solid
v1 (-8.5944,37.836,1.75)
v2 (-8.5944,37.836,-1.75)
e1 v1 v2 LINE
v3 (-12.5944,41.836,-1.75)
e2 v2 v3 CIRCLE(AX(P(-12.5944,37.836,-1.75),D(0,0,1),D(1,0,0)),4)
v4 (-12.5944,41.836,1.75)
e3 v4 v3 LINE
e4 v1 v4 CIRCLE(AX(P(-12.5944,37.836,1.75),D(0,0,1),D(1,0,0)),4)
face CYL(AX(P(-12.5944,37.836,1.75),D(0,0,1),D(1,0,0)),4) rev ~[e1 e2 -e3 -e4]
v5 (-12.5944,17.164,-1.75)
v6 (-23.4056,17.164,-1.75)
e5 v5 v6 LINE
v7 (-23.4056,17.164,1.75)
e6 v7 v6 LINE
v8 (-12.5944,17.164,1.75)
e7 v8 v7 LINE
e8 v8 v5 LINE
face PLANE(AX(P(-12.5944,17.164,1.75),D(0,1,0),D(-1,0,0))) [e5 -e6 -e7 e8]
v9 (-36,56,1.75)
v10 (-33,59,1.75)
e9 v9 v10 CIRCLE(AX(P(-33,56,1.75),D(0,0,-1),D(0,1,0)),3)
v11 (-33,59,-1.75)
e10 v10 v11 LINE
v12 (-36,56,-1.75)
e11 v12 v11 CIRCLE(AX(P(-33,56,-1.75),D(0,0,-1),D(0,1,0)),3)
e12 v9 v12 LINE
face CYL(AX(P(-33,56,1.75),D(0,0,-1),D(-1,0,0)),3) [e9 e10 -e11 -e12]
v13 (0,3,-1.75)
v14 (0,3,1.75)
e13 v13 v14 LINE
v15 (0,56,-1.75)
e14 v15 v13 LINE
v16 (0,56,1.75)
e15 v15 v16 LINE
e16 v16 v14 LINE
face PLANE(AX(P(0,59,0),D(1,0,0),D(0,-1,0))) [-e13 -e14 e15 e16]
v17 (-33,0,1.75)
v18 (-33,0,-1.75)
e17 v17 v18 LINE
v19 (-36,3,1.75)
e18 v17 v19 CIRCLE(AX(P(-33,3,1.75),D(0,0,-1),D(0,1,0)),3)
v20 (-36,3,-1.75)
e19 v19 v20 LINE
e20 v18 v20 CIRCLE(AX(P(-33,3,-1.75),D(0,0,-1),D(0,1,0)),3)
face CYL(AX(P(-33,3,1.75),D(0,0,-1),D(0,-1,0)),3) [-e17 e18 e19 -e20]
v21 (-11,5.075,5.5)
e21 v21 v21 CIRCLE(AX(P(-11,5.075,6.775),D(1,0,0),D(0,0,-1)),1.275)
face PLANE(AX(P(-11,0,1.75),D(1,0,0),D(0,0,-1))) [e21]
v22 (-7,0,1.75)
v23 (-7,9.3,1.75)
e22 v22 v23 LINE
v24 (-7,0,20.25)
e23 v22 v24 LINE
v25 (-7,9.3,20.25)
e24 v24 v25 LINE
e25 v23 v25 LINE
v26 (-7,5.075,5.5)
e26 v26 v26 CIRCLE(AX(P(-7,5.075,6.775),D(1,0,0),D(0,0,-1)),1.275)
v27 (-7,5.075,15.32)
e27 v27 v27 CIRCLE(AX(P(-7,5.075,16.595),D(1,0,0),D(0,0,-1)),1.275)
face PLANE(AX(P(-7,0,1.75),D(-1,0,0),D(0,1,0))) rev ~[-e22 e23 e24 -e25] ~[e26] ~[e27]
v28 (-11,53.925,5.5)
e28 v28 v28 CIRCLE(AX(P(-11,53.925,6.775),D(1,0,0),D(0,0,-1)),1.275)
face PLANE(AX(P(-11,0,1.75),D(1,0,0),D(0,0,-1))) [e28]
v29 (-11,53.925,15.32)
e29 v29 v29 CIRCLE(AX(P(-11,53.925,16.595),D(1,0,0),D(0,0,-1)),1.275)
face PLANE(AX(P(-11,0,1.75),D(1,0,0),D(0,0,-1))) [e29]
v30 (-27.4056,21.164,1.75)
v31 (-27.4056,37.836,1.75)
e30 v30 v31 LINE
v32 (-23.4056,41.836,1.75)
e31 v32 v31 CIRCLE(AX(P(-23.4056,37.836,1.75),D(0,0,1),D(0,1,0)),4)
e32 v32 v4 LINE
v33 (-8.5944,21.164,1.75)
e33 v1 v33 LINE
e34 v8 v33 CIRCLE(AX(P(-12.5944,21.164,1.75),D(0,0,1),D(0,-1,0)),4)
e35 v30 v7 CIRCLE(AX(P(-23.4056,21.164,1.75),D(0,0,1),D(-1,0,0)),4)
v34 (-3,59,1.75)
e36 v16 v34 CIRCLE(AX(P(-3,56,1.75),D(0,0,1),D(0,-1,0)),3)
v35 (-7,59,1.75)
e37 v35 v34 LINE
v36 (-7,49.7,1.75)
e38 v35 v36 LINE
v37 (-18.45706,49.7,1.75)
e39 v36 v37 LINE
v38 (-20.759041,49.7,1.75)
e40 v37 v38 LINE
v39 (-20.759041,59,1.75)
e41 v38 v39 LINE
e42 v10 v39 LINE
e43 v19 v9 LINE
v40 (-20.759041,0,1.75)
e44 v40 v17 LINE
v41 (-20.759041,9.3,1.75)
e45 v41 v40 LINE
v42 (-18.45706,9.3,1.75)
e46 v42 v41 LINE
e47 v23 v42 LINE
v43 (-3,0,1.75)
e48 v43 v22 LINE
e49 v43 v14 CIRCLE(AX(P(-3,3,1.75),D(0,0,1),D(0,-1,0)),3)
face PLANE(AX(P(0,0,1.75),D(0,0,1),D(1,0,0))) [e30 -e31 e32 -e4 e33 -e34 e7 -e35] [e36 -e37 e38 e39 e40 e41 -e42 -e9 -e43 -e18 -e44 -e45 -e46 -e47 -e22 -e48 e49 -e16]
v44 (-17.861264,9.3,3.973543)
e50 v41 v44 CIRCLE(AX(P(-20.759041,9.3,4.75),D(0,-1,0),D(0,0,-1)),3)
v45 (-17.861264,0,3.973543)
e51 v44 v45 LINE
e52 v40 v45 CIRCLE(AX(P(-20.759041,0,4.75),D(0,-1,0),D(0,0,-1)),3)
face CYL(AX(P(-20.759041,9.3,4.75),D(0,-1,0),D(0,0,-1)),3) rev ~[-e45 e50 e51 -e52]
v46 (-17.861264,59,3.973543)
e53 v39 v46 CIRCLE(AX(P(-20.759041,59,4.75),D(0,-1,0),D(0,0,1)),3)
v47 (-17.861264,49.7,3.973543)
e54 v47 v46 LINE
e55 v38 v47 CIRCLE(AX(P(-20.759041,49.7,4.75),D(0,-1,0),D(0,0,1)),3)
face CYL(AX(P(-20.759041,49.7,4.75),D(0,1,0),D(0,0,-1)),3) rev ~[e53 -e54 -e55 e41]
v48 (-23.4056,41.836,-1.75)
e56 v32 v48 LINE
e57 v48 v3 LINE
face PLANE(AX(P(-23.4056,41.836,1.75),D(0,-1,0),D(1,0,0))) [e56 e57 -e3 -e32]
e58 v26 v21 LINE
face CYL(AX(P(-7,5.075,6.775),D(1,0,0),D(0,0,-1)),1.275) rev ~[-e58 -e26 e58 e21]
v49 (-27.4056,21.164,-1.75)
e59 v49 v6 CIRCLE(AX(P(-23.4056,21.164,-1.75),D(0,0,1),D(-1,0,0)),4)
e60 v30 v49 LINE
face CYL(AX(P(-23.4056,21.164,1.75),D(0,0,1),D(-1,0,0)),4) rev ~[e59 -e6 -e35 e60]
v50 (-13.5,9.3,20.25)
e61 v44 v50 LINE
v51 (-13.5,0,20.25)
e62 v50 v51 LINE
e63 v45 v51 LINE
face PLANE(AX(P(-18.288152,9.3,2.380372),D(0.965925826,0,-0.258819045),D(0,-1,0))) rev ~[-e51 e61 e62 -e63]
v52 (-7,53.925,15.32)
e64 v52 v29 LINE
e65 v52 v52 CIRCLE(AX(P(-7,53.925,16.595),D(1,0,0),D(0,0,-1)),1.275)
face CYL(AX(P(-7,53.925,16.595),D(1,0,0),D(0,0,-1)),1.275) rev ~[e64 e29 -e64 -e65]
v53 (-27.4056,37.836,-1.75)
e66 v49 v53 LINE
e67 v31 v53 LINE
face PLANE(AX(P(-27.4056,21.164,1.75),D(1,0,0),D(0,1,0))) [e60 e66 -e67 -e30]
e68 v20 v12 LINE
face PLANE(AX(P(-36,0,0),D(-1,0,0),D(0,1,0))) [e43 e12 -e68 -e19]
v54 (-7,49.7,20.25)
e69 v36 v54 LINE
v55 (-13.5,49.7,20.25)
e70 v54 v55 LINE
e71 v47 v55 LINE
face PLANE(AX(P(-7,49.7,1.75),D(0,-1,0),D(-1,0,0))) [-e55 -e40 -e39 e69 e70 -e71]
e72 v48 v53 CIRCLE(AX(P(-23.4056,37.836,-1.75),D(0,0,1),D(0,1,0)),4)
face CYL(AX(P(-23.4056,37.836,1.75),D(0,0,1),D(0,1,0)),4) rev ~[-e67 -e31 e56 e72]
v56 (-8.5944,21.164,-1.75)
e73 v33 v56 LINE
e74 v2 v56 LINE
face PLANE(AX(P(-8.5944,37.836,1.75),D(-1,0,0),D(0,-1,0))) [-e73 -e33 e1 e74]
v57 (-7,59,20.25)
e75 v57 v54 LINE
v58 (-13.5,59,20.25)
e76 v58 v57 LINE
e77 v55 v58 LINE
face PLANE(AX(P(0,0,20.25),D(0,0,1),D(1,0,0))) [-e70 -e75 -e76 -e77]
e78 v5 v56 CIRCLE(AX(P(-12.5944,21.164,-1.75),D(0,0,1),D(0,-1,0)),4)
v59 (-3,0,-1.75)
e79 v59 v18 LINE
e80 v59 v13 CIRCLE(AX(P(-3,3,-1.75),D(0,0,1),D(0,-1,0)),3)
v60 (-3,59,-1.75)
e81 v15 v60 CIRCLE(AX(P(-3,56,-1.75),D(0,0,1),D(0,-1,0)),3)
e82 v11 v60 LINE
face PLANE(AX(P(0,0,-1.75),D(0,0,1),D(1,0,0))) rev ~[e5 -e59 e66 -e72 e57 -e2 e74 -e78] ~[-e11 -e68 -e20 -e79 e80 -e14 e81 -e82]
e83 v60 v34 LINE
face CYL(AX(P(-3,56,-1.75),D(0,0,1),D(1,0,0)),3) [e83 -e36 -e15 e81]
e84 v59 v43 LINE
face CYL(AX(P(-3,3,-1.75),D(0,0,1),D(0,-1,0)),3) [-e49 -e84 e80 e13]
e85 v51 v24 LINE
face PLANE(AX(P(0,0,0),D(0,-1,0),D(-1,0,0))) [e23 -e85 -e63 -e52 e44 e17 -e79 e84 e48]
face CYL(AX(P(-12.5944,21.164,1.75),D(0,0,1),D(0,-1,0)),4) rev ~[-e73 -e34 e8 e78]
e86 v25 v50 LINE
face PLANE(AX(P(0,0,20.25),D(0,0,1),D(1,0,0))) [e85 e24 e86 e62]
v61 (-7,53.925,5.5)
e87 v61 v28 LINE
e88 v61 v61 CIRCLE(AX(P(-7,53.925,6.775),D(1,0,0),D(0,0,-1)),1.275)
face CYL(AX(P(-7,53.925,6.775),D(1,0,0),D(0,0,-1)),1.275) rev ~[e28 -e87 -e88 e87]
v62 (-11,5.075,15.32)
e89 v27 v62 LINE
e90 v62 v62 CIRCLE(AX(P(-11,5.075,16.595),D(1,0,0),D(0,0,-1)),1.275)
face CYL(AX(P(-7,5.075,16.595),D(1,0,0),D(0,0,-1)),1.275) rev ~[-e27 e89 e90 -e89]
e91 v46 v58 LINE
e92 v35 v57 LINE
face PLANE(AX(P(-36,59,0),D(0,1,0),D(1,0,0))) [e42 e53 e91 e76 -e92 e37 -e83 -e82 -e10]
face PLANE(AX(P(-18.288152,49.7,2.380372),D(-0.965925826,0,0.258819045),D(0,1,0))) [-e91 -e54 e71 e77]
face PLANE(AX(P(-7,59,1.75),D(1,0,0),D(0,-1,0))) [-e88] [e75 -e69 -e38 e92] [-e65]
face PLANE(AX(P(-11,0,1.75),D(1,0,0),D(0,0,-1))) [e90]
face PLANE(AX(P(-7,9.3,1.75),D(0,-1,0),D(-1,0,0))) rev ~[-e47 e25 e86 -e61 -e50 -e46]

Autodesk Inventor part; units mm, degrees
ref_plane "YZ Plane" through (0, 0, 0) normal (1, 0, 0) x (0, 1, 0)
ref_plane "XZ Plane" through (0, 0, 0) normal (0, 1, 0) x (-1, 0, 0)
ref_plane "XY Plane" through (0, 0, 0) normal (0, 0, 1) x (1, 0, 0)
sketch "Base" plane through (0, 0, 0) normal (0, 0, 1) x (1, 0, 0)
  line L0 (0, 0) -> (-36, 0)
  line L1 (-36, 0) -> (-36, 59)
  line L2 (-36, 59) -> (0, 59)
  line L3 (0, 59) -> (0, 0)
  dimension "d0" = 36
  dimension "d1" = 59
extrude "Extrusion1" add sketch "Base" along normal mid plane 3.5
sketch "Attachment Towers" plane through (0, 0, 1.75) normal (0, 0, 1) x (1, 0, 0)
  line L0 (0, 29.5) -> (-7, 29.5) construction
  line L1 (-7, 29.5) -> (-7, 49.7) construction
  line L2 (-7, 29.5) -> (-7, 9.3) construction
  line L3 (-7, 49.7) -> (-13.5, 49.7)
  line L4 (-13.5, 49.7) -> (-13.5, 59)
  line L5 (-13.5, 59) -> (-7, 59)
  line L6 (-7, 59) -> (-7, 49.7)
  line L7 (-7, 9.3) -> (-13.5, 9.3)
  line L8 (-13.5, 9.3) -> (-13.5, 0)
  line L9 (-13.5, 0) -> (-7, 0)
  line L10 (-7, 0) -> (-7, 9.3)
  dimension "d41" = 7
  dimension "d44" = 40.4
  dimension "d45" = 6.5
  dimension "d46" = 9.3
extrude "Extrusion3" add sketch "Attachment Towers" along normal blind 18.5
sketch "Screw Holes" plane through (-7, 0, 1.75) normal (1, 0, 0) x (0, 0, -1)
  line L0 (0, 49.7) -> (0, 51.8) construction
  line L1 (0, 51.8) -> (-7.15, 51.8) construction
  circle A0 centre (-5.025, 53.925) radius 2.125 construction
  line L2 (-7.15, 51.8) -> (-7.15, 61.0367) construction
  line L3 (-2.9, 53.925) -> (-16.97, 53.925) construction
  circle A1 centre (-14.845, 53.925) radius 2.125 construction
  line L4 (-16.97, 51.8) -> (-16.97, 61.0367) construction
  circle A2 centre (-14.845, 53.925) radius 1.275
  circle A3 centre (-5.025, 53.925) radius 1.275
  line L5 (0, 29.5) -> (-35.6681, 29.5) construction
  circle A4 centre (-14.845, 5.075) radius 1.275
  circle A5 centre (-5.025, 5.075) radius 1.275
  dimension "d18" = 4.25
  dimension "d15" = 2.1
  dimension "d16" = 7.15
  dimension "d20" = 14.07
  dimension "d21" = 4.25
  dimension "d22" = 2.55
  dimension "d23" = 2.55
extrude "Extrusion4" cut sketch "Screw Holes" against normal blind 4
draft "FaceDraft1" angle 15 pull direction (0, 0, 1) faces at (-13.5, 6.2, 7.9167) (-13.5, 55.9, 7.9167) fixed edges at (-13.5, 4.65, 20.25) (-13.5, 54.35, 20.25)
sketch "Sketch5" plane through (0, 0, 1.75) normal (0, 0, 1) x (1, 0, 0)
  line L0 (-36, 29.5) -> (0, 29.5) construction
  line L1 (-23.4056, 41.836) -> (-12.5944, 41.836)
  line L2 (-8.5944, 37.836) -> (-8.5944, 21.164)
  line L3 (-12.5944, 17.164) -> (-23.4056, 17.164)
  line L4 (-27.4056, 21.164) -> (-27.4056, 37.836)
  line L5 (-27.4056, 41.836) -> (-8.5944, 17.164) construction
  line L6 (-8.5944, 41.836) -> (-27.4056, 17.164) construction
  arc A0 (-27.4056, 21.164) -> (-23.4056, 17.164) centre (-23.4056, 21.164) ccw
  arc A1 (-12.5944, 17.164) -> (-8.5944, 21.164) centre (-12.5944, 21.164) ccw
  arc A2 (-8.5944, 37.836) -> (-12.5944, 41.836) centre (-12.5944, 37.836) ccw
  arc A3 (-23.4056, 41.836) -> (-27.4056, 37.836) centre (-23.4056, 37.836) ccw
  point P0 (-18, 29.5)
  dimension "d47" = 4
extrude "Extrusion5" cut sketch "Sketch5" against normal through all
fillet "Fillet1" radius 3 6 edges at (0, 0, 0) (0, 59, 0) (-36, 59, 0) (-36, 0, 0) (-18.4571, 4.65, 1.75) (-18.4571, 54.35, 1.75)
sketch "Sketch6" plane through (-7, 0, 1.75) normal (1, 0, 0) x (0, 0, -1)
  circle A0 centre (-14.845, 5.075) radius 1.275 construction
  line L0 (-13.57, 5.075) -> (-6.3, 5.075) construction
  circle A1 centre (-5.025, 5.075) radius 1.275 construction
  line L1 (-9.935, 5.075) -> (-9.935, 39.375) construction
  line L2 (-9.935, 53.925) -> (-9.935, 39.375) construction
  point P0 (1.75, 0)
  dimension "d48" = 34.3
  dimension "d49" = 14.55
properties part number "MG996R Attachment Test"
